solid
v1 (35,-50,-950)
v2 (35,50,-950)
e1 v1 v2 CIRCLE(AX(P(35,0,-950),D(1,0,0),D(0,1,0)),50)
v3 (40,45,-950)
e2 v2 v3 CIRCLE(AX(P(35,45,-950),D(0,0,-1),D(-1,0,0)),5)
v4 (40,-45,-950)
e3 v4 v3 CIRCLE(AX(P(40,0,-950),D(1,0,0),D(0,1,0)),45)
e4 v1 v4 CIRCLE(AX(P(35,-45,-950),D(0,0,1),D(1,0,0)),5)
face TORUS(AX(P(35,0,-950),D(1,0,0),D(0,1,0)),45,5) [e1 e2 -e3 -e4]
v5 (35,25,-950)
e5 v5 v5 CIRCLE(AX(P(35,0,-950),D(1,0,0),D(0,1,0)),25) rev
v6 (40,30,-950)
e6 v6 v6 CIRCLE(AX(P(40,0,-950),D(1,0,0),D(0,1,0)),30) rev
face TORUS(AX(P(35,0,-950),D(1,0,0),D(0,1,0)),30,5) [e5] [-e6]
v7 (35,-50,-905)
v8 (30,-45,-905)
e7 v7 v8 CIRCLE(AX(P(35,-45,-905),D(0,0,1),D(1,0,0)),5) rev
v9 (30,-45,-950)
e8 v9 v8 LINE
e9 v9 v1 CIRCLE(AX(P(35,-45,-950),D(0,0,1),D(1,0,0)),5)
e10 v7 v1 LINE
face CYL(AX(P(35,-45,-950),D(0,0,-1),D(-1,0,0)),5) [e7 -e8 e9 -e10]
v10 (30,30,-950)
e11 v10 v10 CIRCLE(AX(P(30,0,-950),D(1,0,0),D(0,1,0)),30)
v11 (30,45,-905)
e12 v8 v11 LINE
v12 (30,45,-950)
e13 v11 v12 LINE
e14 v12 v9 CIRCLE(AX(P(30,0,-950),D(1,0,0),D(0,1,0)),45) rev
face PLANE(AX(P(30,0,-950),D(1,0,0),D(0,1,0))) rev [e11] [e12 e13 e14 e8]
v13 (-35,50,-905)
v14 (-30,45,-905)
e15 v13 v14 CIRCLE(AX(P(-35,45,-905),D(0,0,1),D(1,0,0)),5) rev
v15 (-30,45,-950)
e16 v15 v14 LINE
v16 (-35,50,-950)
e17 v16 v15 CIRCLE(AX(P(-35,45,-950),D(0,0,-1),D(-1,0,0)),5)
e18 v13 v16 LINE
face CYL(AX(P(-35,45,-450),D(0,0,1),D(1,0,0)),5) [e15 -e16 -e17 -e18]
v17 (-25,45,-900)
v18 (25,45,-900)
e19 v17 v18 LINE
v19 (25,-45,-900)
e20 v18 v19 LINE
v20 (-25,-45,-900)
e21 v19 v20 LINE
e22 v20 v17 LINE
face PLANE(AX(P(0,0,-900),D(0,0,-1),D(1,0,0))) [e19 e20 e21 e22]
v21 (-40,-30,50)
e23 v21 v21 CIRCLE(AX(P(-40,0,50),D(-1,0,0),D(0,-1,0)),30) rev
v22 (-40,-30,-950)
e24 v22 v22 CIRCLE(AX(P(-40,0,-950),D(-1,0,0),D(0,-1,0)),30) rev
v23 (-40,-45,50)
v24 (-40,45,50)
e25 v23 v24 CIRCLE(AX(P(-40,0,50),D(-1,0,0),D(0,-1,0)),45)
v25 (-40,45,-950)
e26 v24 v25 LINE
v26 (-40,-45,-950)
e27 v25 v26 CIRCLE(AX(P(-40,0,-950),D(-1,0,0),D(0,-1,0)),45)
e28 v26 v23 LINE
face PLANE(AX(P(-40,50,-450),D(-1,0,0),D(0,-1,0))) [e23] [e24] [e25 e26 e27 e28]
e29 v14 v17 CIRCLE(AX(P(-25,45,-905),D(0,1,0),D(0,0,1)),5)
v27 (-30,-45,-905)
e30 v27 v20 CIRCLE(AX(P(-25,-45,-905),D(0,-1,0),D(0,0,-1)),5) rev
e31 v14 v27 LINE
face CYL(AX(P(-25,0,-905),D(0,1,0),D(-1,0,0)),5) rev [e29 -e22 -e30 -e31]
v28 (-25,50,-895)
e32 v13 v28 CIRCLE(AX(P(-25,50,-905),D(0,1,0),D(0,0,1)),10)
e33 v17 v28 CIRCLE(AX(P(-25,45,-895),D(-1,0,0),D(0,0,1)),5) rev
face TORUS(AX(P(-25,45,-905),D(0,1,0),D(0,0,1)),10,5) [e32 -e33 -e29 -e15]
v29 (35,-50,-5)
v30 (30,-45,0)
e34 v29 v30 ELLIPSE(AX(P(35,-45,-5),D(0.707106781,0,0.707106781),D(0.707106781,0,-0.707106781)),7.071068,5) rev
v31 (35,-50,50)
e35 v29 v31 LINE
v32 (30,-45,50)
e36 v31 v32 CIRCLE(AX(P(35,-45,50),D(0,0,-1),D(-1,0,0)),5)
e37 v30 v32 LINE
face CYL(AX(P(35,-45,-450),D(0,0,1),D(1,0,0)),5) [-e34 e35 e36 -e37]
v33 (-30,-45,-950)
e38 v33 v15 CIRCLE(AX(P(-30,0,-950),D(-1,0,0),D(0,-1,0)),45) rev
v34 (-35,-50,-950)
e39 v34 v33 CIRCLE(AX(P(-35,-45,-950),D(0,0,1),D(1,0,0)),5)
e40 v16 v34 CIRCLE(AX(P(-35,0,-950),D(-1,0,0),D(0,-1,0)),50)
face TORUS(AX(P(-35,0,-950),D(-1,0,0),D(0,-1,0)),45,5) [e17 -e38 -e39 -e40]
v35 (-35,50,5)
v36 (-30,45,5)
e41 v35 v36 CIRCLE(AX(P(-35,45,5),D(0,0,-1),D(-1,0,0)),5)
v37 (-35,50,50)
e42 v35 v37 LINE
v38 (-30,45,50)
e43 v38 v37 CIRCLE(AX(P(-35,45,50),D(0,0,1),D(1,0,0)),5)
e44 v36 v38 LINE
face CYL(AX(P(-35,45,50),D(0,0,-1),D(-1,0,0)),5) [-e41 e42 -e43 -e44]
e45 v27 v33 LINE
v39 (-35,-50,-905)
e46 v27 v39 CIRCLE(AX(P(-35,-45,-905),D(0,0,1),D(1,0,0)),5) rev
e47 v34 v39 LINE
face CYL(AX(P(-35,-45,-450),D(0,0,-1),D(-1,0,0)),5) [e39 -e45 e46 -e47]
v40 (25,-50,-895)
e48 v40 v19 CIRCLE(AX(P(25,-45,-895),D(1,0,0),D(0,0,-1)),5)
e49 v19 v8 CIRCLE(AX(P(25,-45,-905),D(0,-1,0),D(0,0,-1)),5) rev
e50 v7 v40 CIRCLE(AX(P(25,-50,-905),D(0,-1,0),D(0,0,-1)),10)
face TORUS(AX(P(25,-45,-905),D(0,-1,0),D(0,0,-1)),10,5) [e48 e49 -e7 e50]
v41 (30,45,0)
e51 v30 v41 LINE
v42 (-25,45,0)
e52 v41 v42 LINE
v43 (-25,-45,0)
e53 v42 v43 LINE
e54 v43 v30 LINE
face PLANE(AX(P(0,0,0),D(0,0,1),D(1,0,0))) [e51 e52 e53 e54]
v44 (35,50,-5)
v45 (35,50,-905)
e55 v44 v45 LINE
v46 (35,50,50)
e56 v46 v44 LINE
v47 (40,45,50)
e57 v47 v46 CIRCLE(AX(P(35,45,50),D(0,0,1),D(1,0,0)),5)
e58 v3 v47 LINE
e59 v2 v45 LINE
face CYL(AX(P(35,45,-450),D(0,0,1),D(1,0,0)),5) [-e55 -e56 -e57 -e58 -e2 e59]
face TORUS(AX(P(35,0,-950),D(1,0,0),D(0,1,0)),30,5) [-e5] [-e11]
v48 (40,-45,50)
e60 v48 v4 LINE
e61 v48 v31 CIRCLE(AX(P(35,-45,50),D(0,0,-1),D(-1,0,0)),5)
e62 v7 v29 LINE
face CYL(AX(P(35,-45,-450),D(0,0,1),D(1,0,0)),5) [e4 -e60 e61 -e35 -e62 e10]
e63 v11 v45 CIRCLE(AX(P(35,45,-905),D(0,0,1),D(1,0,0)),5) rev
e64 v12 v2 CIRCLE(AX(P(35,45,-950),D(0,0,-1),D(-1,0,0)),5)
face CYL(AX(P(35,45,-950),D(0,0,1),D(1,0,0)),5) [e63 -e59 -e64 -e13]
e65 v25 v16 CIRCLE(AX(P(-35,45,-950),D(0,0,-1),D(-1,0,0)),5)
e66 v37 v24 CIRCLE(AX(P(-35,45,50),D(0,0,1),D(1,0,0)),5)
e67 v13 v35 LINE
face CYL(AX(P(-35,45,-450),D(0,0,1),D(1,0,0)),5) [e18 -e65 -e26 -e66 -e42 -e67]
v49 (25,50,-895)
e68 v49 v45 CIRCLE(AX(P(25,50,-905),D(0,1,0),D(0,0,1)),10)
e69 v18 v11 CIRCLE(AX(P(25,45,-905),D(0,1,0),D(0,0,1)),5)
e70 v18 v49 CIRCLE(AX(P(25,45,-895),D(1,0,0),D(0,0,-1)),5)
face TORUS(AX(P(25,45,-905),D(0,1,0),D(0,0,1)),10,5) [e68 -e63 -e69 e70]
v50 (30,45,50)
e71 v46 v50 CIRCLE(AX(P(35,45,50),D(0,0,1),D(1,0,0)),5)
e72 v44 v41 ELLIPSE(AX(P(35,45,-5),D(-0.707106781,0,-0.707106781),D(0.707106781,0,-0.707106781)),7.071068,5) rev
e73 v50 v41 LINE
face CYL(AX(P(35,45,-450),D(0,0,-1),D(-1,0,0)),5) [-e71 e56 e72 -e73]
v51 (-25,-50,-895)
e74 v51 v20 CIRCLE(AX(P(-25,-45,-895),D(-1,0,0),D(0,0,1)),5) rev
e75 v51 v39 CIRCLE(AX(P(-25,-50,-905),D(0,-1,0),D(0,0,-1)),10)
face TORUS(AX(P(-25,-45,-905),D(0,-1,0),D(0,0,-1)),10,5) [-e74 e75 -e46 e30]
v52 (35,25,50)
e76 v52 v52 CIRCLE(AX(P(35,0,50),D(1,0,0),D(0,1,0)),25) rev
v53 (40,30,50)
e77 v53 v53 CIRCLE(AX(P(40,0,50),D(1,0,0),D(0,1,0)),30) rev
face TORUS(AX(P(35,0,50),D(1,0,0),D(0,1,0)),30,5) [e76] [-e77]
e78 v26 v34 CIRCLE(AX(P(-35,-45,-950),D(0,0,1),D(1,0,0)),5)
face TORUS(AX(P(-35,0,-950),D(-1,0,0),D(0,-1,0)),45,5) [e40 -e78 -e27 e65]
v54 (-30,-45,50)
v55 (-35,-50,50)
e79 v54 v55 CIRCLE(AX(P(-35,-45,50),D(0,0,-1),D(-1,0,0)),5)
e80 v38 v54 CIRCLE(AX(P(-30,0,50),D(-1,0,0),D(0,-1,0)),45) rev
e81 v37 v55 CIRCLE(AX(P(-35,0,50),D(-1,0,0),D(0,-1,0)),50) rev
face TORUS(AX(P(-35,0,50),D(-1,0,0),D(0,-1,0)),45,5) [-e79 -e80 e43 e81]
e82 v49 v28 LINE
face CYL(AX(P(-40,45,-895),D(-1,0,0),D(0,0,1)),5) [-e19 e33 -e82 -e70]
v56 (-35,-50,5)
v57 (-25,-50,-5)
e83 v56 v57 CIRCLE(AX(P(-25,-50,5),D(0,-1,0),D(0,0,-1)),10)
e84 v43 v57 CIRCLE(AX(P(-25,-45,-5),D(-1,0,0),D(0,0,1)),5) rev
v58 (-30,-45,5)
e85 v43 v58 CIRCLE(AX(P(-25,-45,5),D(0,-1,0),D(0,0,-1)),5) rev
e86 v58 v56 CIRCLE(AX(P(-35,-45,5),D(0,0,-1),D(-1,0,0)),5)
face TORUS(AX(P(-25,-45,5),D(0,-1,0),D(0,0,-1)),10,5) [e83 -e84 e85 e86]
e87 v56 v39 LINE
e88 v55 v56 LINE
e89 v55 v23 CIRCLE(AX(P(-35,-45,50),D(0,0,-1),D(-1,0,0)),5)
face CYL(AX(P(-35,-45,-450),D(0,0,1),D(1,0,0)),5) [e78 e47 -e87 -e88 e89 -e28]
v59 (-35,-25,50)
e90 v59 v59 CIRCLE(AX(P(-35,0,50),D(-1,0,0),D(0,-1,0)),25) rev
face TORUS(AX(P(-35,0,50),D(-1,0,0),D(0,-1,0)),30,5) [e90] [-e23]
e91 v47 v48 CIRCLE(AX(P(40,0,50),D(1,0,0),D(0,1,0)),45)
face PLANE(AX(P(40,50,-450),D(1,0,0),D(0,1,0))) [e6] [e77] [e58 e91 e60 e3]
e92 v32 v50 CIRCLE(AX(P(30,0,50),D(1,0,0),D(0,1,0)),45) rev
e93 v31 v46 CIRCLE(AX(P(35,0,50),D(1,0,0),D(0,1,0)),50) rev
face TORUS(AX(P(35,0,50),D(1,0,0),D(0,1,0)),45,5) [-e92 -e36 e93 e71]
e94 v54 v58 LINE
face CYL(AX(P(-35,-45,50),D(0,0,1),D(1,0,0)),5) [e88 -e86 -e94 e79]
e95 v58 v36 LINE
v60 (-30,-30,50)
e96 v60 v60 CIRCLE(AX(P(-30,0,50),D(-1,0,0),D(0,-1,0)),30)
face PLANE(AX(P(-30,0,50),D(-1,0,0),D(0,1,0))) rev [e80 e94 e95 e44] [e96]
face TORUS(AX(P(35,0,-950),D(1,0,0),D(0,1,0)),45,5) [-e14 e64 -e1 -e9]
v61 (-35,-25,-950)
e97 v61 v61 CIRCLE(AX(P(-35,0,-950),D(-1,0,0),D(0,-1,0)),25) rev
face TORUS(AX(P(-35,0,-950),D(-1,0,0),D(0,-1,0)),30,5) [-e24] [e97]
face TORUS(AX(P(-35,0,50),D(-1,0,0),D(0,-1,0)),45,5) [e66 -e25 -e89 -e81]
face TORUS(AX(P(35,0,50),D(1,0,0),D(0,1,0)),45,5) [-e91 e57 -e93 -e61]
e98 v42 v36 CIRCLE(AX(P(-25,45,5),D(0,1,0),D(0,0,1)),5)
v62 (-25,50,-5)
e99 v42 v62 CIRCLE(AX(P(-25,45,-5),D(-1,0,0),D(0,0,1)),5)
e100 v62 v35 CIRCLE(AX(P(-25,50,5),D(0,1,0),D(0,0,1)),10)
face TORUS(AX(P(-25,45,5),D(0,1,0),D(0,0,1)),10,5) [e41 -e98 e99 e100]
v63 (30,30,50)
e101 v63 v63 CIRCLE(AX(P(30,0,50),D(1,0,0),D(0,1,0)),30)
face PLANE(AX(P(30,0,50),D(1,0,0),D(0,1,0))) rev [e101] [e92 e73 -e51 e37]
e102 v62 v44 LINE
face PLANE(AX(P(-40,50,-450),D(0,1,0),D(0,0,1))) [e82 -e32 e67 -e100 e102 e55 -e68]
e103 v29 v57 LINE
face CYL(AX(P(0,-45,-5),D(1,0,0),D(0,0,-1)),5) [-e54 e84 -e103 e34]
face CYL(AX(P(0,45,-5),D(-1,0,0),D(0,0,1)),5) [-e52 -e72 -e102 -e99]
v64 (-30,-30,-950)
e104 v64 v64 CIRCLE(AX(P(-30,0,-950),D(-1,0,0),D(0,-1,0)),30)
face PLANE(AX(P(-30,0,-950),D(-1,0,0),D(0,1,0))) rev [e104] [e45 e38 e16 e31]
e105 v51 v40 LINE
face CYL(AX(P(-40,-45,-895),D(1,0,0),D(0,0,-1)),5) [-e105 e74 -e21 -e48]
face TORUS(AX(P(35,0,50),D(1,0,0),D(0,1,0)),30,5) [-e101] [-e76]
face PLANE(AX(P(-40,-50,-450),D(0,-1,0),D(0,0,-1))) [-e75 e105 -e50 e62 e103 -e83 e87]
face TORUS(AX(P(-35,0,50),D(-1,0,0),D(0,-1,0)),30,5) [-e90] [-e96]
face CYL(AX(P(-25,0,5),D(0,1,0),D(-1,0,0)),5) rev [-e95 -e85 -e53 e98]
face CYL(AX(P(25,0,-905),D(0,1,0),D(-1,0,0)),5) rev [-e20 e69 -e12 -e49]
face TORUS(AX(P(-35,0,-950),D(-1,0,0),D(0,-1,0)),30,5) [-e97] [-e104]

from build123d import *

# Parameters (mm, degrees)
SKETCH2_W                      = 80
SKETCH2_H                      = 100
BOSS_EXTRUDE1_DEPTH            = 450
BOSS_EXTRUDE2_DEPTH            = 10
BOSS_EXTRUDE3_DEPTH            = 10
CUT_EXTRUDE4_REACH             = 466.973
SKETCH8_R                      = 25
CUT_EXTRUDE4_DIRECTION_2_REACH = 466.973
FILLET1_R                      = 10
SKETCH10_R                     = 10
BOSS_EXTRUDE5_DEPTH            = 60
MIRROR5_START                  = -40
MIRROR5_OUTLINE_W              = 100
MIRROR5_OUTLINE_H              = 450
MIRROR5_OUTLINE_R              = 10
MIRROR5_DEPTH                  = 80
MIRROR5_2_OUTLINE_R            = 25
MIRROR5_2_OUTLINE_R_2          = 10
MIRROR5_2_DEPTH                = 10
MIRROR5_START_2                = 30
MIRROR5_3_OUTLINE_R            = 25
MIRROR5_3_OUTLINE_R_2          = 10
MIRROR5_3_DEPTH                = 10
SKETCH12_W                     = 80
SKETCH12_H                     = 60
CUT_EXTRUDE6_DEPTH             = 500
FILLET2_R                      = 5


# Read off the part's stored shape, not the designer's step: Mirror5
with BuildPart() as part:
    # Sketch2 → Boss-Extrude1 (new body)
    with BuildSketch(Plane.XY):
        Rectangle(SKETCH2_W, SKETCH2_H)
    extrude(amount=-BOSS_EXTRUDE1_DEPTH)

    # Sketch6 → Boss-Extrude2 (add)
    with BuildSketch(Plane(origin=(40, 0, 0), x_dir=(0, 0, -1), z_dir=(1, 0, 0))):
        with BuildLine():
            Line((220, -50), (280, -50))
            Line((280, -50), (280, -80))
            ThreePointArc((280, -80), (250, -110), (220, -80))
            Line((220, -80), (220, -50))
        make_face()
    boss_extrude2 = extrude(amount=-BOSS_EXTRUDE2_DEPTH)

    # Sketch7 → Boss-Extrude3 (add)
    with BuildSketch(Plane(origin=(40, 0, 0), x_dir=(0, 0, -1), z_dir=(1, 0, 0))):
        with BuildLine():
            Line((0, 50), (0, -50))
            Line((0, -50), (-50, -50))
            ThreePointArc((-50, -50), (-100, 0), (-50, 50))
            Line((-50, 50), (0, 50))
        make_face()
    boss_extrude3 = extrude(amount=-BOSS_EXTRUDE3_DEPTH)

    # Mirror3: Boss-Extrude3 across plane
    add(boss_extrude3.mirror(Plane(origin=(0, 0, 0), x_dir=(0, 0, 1), z_dir=(1, 0, 0))))

    # Cut-Extrude4: up to this face of the body (flat: up to its plane)
    cut_extrude4_end = Plane(part.part.faces().sort_by_distance((-40, 0, -180.249574073))[0])
    # Sketch8 → Cut-Extrude4 (cut, up to the picked face)
    with BuildSketch(Plane(origin=(0, 0, 0), x_dir=(0, 0, -1), z_dir=(1, 0, 0)), mode=Mode.PRIVATE) as cut_extrude4_sk1:
        with Locations(Location((-50, 0, 0), (0, 0, 270))):
            Circle(SKETCH8_R)
    cut_extrude4_tool1 = split(extrude(cut_extrude4_sk1.sketch, amount=-CUT_EXTRUDE4_REACH, mode=Mode.PRIVATE), bisect_by=cut_extrude4_end, keep=Keep.BOTH, mode=Mode.PRIVATE)
    add(cut_extrude4_tool1.solids().sort_by(Axis((0, 0, 50), (-1, 0, 0)))[0], mode=Mode.SUBTRACT)

    # Cut-Extrude4 direction 2: up to this face of the body (flat: up to its plane)
    cut_extrude4_direction_2_end = Plane(part.part.faces().sort_by_distance((40, -4.341866707, -184.172488542))[0])
    # Sketch8 → Cut-Extrude4 direction 2 (cut, up to the picked face)
    with BuildSketch(Plane(origin=(0, 0, 0), x_dir=(0, 0, -1), z_dir=(1, 0, 0)), mode=Mode.PRIVATE) as cut_extrude4_direction_2_sk1:
        with Locations(Location((-50, 0, 0), (0, 0, 270))):
            Circle(SKETCH8_R)
    cut_extrude4_direction_2_tool1 = split(extrude(cut_extrude4_direction_2_sk1.sketch, amount=CUT_EXTRUDE4_DIRECTION_2_REACH, mode=Mode.PRIVATE), bisect_by=cut_extrude4_direction_2_end, keep=Keep.BOTH, mode=Mode.PRIVATE)
    add(cut_extrude4_direction_2_tool1.solids().sort_by(Axis((0, 0, 50), (1, 0, 0)))[0], mode=Mode.SUBTRACT)

    # Mirror4: Boss-Extrude2 across plane
    add(boss_extrude2.mirror(Plane(origin=(0, 0, 0), x_dir=(0, 0, 1), z_dir=(1, 0, 0))))

    # Fillet1
    fillet1_edges = [part.edges().sort_by_distance(p)[0] for p in [
        (-35, -50, -280),
        (35, -50, -280),
        (-35, -50, -220),
        (35, -50, -220),
    ]]
    fillet(fillet1_edges, radius=FILLET1_R)

    # Sketch10 → Boss-Extrude5 (add)
    with BuildSketch(Plane.ZY.offset(-30)):
        with Locations(Location((-250, -80, 0), (0, 0, 90))):
            Circle(SKETCH10_R)
    extrude(amount=BOSS_EXTRUDE5_DEPTH)

    # Mirror5 outline → Mirror5 (add)
    with BuildSketch(Plane.YZ.offset(MIRROR5_START)):
        with Locations((0, -675)):
            Rectangle(MIRROR5_OUTLINE_W, MIRROR5_OUTLINE_H)
        with Locations((-80, -650)):
            Circle(MIRROR5_OUTLINE_R)
    extrude(amount=MIRROR5_DEPTH)

    # Mirror5 2 outline → Mirror5 2 (add)
    # profile 1 of 2: a face of its own
    with BuildSketch(Plane.YZ.offset(MIRROR5_START)):
        with BuildLine():
            Line((50, -900), (-50, -900))
            Line((-50, -900), (-50, -950))
            ThreePointArc((-50, -950), (0, -1000), (50, -950))
            Line((50, -950), (50, -900))
        make_face()
        with Locations((0, -950)):
            Circle(MIRROR5_2_OUTLINE_R, mode=Mode.SUBTRACT)
    # profile 2 of 2: a face of its own
    with BuildSketch(Plane.YZ.offset(MIRROR5_START)):
        with BuildLine():
            ThreePointArc((-60, -680), (-52.928932188, -682.928932188), (-50, -690))
            Line((-50, -690), (-50, -610))
            ThreePointArc((-50, -610), (-52.928932188, -617.071067812), (-60, -620))
            Line((-60, -620), (-80, -620))
            ThreePointArc((-80, -620), (-110, -650), (-80, -680))
            Line((-80, -680), (-60, -680))
        make_face()
        with Locations((-80, -650)):
            Circle(MIRROR5_2_OUTLINE_R_2, mode=Mode.SUBTRACT)
    extrude(amount=MIRROR5_2_DEPTH)

    # Mirror5 3 outline → Mirror5 3 (add)
    # profile 1 of 2: a face of its own
    with BuildSketch(Plane.YZ.offset(MIRROR5_START_2)):
        with BuildLine():
            Line((50, -900), (-50, -900))
            Line((-50, -900), (-50, -950))
            ThreePointArc((-50, -950), (0, -1000), (50, -950))
            Line((50, -950), (50, -900))
        make_face()
        with Locations((0, -950)):
            Circle(MIRROR5_3_OUTLINE_R, mode=Mode.SUBTRACT)
    # profile 2 of 2: a face of its own
    with BuildSketch(Plane.YZ.offset(MIRROR5_START_2)):
        with BuildLine():
            ThreePointArc((-60, -680), (-52.928932188, -682.928932188), (-50, -690))
            Line((-50, -690), (-50, -610))
            ThreePointArc((-50, -610), (-52.928932188, -617.071067812), (-60, -620))
            Line((-60, -620), (-80, -620))
            ThreePointArc((-80, -620), (-110, -650), (-80, -680))
            Line((-80, -680), (-60, -680))
        make_face()
        with Locations((-80, -650)):
            Circle(MIRROR5_3_OUTLINE_R_2, mode=Mode.SUBTRACT)
    extrude(amount=MIRROR5_3_DEPTH)

    # Sketch12 → Cut-Extrude6 (cut, symmetric)
    with BuildSketch(Plane(origin=(0, 0, -450), x_dir=(-1, 0, 0), z_dir=(0, 0, -1))):
        with Locations((0, -80)):
            Rectangle(SKETCH12_W, SKETCH12_H)
    extrude(amount=CUT_EXTRUDE6_DEPTH, both=True, mode=Mode.SUBTRACT)

    # Fillet2
    fillet2_edges = [part.edges().sort_by_distance(p)[0] for p in [
        (0, -50, 0),
        (30, 50, -925),
        (30, -50, -925),
        (30, -50, 25),
        (-40, -50, -450),
        (40, -25, -950),
        (30, -25, -950),
        (-40, -25, -950),
        (-30, -25, -950),
        (-40, 0, -1000),
        (-30, 0, -1000),
        (-30, 50, -925),
        (-30, -50, -925),
        (-30, 0, -900),
        (40, 0, -1000),
        (30, 0, -1000),
        (30, 0, -900),
        (0, -50, -900),
        (0, 50, -900),
        (40, 25, 50),
        (-40, 25, 50),
        (-30, 25, 50),
        (30, 25, 50),
        (-40, 0, 100),
        (-30, 0, 100),
        (-30, 50, 25),
        (-30, -50, 25),
        (-30, 0, 0),
        (40, 0, 100),
        (30, 0, 100),
        (30, 50, 25),
        (0, 50, 0),
        (40, 50, -450),
        (-40, 50, -450),
        (40, -50, -450),
    ]]
    fillet(fillet2_edges, radius=FILLET2_R - 0.0001)  # a hair under: the kernel refuses the full size


solid = part.part
